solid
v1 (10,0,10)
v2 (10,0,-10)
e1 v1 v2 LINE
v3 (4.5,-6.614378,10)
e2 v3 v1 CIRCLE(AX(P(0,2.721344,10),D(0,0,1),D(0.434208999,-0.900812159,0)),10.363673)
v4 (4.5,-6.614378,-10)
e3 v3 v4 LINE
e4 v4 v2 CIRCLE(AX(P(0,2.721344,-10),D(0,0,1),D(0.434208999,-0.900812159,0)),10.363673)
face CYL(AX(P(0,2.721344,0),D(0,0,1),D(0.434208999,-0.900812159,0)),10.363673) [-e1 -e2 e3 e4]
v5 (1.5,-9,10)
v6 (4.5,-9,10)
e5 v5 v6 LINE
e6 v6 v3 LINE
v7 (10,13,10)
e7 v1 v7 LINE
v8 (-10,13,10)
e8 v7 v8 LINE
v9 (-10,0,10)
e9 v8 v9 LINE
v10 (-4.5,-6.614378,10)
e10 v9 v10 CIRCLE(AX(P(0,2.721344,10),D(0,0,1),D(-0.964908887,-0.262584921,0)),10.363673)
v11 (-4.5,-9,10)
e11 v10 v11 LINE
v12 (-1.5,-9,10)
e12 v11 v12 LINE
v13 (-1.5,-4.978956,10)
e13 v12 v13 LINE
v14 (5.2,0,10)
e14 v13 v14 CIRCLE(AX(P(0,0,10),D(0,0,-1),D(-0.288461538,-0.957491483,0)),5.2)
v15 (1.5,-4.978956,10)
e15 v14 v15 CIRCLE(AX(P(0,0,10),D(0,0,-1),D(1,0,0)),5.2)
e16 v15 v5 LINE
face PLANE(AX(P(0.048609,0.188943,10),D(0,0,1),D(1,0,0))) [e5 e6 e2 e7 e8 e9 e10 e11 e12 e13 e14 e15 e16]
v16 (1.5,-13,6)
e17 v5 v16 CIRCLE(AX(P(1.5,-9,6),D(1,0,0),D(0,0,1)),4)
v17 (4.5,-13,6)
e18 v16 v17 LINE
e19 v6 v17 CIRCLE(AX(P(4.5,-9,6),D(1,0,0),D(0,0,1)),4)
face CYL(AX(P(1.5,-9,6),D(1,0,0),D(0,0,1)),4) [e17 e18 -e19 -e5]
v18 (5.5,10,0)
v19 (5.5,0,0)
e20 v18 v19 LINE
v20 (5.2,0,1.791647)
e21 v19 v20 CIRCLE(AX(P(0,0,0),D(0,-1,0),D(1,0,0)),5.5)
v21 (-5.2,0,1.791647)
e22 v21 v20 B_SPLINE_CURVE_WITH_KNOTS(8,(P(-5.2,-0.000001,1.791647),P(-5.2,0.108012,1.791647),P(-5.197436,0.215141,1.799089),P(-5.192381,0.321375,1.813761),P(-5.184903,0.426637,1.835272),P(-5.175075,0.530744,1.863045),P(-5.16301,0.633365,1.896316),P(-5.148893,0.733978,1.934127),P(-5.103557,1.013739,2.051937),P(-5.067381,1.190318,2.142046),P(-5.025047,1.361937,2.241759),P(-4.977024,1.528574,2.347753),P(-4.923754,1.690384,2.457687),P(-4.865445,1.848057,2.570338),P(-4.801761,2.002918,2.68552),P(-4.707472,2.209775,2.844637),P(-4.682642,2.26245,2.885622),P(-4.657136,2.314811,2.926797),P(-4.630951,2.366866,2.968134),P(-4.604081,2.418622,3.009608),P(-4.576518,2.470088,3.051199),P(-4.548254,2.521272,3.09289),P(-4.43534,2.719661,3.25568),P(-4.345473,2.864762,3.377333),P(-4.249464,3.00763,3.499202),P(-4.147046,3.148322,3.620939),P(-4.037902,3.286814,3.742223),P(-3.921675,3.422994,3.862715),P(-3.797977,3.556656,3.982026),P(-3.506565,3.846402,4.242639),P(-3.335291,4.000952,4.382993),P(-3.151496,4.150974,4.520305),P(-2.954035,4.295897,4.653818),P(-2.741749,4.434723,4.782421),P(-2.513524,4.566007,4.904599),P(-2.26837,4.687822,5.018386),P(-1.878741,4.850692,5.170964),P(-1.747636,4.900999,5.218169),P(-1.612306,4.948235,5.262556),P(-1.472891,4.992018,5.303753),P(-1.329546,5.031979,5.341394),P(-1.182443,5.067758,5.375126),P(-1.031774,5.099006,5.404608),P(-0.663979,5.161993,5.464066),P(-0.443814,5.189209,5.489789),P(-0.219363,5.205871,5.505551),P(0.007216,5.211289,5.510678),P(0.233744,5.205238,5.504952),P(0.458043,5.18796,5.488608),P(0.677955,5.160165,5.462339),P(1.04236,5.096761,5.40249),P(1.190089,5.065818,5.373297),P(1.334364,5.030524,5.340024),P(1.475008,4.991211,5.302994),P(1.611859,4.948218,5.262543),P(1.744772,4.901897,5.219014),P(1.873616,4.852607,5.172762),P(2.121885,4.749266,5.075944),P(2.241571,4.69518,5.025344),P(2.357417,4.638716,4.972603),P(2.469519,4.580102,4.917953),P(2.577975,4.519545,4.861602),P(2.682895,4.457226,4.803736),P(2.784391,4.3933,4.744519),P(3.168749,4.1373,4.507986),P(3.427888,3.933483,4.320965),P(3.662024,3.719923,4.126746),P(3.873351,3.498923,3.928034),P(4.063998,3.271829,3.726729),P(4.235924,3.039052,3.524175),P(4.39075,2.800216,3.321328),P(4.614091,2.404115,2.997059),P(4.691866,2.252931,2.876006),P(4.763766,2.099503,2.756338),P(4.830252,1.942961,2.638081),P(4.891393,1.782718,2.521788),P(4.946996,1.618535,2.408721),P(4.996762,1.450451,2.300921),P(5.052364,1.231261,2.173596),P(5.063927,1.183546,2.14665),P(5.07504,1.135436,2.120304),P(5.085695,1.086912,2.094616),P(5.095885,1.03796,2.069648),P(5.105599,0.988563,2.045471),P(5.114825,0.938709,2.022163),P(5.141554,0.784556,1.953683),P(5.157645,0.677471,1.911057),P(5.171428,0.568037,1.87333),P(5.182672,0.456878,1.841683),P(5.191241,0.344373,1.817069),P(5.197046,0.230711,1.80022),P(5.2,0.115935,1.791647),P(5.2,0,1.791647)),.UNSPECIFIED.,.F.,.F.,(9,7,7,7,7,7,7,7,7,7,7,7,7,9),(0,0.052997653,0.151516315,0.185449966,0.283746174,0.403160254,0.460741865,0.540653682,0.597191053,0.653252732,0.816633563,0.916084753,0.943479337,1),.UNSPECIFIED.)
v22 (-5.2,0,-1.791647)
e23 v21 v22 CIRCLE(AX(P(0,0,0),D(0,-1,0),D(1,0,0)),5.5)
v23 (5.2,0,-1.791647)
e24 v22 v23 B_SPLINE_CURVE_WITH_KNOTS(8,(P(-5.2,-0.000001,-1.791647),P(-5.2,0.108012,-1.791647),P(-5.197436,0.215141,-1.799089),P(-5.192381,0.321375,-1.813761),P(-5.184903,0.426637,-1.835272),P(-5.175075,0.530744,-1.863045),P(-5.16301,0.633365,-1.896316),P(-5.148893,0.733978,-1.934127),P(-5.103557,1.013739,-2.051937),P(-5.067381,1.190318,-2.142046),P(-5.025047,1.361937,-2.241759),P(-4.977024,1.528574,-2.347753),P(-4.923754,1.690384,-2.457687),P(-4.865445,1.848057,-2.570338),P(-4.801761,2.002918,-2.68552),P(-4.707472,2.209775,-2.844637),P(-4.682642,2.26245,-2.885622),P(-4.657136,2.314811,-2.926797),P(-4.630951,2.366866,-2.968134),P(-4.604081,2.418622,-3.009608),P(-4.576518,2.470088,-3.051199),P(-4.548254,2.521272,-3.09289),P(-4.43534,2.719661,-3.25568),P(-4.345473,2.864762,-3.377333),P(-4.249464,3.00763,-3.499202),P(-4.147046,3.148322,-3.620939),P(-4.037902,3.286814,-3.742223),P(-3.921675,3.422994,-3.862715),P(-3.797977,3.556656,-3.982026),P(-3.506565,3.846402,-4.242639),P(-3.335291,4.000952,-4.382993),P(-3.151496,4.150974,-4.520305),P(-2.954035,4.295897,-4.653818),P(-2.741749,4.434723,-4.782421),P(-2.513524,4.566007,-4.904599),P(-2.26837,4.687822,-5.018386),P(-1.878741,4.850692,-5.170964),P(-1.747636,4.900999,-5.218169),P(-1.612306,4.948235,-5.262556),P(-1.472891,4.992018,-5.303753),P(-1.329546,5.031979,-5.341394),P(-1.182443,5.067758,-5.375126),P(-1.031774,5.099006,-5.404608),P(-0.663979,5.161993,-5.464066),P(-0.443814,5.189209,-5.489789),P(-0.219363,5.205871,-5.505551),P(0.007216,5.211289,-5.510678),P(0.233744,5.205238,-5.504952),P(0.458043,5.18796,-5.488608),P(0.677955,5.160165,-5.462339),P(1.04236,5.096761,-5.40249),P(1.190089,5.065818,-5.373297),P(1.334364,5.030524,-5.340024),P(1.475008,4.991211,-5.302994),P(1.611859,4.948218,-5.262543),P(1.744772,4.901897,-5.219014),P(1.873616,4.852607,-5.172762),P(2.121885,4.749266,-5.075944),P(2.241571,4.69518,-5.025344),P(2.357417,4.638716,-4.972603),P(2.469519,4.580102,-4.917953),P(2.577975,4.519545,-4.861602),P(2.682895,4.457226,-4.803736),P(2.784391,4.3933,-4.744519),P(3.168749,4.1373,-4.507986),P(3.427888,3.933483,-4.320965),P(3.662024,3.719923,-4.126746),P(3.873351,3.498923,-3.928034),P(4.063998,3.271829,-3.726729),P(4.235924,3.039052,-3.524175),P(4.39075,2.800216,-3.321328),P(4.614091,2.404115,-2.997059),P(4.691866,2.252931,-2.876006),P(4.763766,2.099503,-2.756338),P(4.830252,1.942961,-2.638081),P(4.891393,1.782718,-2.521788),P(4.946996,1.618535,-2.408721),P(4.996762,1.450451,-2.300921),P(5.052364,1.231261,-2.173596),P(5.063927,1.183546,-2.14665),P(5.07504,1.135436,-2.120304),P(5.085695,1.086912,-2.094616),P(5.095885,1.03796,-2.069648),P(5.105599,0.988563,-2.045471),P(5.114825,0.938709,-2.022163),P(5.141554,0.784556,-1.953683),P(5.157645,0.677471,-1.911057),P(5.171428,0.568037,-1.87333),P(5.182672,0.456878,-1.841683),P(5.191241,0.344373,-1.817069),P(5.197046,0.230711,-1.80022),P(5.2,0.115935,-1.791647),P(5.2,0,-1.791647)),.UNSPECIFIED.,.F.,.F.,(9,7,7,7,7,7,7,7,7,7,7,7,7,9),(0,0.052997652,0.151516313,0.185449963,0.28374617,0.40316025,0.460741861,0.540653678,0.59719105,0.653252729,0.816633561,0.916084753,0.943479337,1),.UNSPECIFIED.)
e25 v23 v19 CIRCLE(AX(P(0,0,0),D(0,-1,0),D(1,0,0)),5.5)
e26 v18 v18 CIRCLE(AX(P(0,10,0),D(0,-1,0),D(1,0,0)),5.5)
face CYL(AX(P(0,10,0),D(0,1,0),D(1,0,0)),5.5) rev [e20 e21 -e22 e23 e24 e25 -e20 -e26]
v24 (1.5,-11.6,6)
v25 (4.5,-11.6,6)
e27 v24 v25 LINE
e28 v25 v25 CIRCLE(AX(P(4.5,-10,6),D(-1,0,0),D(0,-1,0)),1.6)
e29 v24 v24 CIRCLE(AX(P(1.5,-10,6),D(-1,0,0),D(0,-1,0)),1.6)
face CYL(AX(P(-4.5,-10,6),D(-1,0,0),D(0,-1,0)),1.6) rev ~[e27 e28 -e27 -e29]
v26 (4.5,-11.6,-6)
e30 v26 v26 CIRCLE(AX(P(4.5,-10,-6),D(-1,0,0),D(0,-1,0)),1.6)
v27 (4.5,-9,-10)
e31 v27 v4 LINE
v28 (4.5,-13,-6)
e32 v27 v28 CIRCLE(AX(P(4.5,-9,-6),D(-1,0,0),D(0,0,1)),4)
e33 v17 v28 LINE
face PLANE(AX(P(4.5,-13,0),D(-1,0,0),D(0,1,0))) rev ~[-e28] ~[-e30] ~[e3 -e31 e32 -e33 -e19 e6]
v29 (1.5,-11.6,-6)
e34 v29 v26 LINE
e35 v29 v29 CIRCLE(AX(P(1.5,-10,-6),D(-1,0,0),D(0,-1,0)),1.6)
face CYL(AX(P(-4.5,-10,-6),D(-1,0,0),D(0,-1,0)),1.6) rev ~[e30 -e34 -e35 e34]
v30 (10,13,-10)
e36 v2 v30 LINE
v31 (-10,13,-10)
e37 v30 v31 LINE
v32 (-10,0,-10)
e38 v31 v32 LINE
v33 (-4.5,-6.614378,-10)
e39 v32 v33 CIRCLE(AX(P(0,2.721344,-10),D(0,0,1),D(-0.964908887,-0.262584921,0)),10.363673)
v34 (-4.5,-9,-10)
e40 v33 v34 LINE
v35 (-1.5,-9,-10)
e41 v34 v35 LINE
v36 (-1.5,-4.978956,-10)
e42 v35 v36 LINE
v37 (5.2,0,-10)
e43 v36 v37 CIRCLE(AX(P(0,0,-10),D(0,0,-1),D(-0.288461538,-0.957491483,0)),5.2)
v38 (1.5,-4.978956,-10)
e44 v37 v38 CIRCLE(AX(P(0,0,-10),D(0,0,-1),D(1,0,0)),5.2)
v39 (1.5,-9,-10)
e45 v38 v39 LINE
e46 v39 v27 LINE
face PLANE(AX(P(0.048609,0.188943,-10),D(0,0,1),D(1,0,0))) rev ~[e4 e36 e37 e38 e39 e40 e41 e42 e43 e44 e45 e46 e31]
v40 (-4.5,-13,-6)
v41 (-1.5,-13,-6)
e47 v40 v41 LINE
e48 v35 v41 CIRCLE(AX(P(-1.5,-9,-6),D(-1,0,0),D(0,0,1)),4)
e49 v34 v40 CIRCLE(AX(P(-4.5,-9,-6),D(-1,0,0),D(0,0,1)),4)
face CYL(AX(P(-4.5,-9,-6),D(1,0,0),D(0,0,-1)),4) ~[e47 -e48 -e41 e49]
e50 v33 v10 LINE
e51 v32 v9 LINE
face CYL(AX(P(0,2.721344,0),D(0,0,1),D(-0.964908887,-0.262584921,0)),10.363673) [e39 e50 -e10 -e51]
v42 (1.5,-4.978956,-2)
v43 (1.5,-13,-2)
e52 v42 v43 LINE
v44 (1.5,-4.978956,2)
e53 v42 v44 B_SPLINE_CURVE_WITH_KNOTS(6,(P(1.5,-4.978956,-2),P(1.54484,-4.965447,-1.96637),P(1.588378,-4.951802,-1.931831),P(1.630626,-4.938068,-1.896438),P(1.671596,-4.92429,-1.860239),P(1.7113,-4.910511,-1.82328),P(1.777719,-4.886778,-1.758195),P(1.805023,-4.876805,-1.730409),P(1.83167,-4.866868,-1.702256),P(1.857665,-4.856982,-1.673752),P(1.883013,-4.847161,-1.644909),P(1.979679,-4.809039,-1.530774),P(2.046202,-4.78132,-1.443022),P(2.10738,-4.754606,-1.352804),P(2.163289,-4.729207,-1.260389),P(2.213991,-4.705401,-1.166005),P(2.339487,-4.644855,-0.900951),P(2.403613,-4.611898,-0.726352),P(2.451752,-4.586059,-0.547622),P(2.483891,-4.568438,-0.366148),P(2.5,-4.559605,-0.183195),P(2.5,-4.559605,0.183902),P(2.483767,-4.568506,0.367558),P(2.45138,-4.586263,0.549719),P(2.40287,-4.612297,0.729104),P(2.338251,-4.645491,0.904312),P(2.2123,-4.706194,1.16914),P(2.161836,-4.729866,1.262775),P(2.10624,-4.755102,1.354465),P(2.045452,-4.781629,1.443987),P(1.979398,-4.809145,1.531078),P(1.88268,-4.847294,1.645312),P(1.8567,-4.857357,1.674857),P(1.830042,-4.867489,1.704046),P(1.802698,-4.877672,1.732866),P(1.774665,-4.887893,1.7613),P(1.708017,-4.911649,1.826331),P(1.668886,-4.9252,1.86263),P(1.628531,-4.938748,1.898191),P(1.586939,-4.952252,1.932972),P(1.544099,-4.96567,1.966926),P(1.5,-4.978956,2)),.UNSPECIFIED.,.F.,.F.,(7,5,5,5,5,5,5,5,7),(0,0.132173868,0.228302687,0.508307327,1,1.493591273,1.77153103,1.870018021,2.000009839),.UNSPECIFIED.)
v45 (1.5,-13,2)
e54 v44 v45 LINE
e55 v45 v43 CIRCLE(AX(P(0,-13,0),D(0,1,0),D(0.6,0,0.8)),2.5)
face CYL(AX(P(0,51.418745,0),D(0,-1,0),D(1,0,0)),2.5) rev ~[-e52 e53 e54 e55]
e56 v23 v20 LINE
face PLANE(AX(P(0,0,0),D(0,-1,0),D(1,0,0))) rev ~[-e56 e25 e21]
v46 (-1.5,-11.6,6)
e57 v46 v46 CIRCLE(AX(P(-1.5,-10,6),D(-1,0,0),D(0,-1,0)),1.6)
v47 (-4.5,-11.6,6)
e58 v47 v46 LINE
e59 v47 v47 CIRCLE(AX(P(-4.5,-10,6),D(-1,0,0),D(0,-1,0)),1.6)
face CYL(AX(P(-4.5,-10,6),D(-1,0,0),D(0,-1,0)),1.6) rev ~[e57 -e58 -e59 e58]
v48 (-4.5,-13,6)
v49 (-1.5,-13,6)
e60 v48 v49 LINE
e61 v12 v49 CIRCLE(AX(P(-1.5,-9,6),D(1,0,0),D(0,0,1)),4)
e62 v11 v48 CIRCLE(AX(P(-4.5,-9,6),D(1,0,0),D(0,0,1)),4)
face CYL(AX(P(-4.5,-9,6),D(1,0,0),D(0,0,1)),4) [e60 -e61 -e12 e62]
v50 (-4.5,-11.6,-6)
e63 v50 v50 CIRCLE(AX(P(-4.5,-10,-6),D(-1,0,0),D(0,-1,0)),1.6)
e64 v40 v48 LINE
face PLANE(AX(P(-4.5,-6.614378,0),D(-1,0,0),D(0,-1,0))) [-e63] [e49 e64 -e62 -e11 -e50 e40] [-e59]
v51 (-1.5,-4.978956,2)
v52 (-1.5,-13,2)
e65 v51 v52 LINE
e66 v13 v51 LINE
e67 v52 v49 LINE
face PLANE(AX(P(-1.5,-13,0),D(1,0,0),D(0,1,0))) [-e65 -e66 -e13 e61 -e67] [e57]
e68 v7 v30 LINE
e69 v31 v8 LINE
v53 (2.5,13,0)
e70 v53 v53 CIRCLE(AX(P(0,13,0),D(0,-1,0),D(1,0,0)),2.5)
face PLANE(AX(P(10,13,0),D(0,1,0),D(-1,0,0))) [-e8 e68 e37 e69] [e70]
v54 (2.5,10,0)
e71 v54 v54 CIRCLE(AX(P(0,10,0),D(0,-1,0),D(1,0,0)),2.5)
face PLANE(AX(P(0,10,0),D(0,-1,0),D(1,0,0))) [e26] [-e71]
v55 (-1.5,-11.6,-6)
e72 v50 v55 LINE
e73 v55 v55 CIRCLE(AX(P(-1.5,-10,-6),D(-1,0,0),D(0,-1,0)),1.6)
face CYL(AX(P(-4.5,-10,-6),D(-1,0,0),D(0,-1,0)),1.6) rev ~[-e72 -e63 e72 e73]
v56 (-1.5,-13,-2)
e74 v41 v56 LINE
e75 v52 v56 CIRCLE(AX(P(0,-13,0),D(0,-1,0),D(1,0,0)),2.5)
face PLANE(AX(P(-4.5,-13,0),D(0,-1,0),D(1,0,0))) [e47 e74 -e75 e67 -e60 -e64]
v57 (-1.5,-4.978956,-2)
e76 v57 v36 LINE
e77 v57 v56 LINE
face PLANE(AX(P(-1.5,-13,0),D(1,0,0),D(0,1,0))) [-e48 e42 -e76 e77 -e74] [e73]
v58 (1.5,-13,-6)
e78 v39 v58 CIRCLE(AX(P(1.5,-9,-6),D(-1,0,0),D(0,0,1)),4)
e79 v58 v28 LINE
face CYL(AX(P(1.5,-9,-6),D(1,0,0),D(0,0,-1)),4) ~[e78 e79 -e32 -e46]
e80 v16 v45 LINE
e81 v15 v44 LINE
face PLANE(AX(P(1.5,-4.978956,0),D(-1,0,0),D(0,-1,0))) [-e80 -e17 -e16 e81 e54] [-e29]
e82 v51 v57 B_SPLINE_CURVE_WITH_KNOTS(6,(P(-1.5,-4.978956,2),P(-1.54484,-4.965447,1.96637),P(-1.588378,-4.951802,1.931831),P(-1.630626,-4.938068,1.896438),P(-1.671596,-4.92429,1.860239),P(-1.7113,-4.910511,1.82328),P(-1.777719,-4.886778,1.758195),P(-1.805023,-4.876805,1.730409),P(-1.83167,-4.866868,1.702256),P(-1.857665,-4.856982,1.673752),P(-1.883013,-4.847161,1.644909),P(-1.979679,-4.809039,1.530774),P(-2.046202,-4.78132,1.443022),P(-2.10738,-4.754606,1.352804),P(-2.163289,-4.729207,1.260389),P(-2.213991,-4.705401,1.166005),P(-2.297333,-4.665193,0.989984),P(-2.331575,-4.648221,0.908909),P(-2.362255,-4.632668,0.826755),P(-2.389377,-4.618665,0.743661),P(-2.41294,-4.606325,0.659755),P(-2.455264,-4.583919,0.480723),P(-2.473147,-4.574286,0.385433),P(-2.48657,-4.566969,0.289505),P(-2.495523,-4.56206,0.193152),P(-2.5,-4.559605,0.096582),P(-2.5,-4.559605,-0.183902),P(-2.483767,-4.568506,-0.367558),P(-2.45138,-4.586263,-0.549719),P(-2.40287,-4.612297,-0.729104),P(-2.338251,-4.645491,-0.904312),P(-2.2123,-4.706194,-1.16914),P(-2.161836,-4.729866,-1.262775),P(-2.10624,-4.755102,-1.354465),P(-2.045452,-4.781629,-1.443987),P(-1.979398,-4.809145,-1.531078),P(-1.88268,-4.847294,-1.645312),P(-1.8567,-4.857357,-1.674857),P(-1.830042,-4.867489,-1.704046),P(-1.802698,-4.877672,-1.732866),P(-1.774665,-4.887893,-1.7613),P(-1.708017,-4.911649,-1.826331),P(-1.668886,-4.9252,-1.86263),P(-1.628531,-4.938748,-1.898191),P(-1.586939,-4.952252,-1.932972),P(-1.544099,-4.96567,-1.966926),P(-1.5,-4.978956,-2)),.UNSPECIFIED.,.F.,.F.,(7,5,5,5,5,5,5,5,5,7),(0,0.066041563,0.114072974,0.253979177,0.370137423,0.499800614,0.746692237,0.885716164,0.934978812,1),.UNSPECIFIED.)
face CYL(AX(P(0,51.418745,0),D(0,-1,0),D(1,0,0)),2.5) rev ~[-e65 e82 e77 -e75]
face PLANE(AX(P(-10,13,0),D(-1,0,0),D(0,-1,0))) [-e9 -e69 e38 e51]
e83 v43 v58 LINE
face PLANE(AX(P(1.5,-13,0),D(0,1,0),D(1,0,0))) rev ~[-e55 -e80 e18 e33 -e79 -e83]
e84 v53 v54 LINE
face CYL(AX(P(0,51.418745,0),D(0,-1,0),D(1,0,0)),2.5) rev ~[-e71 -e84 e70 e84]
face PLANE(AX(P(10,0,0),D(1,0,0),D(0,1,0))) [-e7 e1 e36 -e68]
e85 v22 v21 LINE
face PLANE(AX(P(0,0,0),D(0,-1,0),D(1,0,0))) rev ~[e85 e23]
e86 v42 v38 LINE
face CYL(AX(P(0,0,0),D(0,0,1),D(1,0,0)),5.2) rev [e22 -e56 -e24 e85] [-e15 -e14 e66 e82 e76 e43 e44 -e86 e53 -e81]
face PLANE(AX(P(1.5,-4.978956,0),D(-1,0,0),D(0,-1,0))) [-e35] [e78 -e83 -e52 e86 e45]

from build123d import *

# Parameters (mm, degrees)
F1_DEPTH = 10
F3_D     = 5
F4_R     = 1.6
F5_DEPTH = 14.501
F7_R     = 5.5
F8_DEPTH = 10
F9_R     = 4


# Not quite as in the source:
# - an extrude ends at something that could not be found from the text; its depth is read off the source's solid


with BuildPart() as f1:
    # F0 (on Top) → F1 (new body, symmetric)
    with BuildSketch(Plane.XY):
        with BuildLine():
            Line((10, 13), (-10, 13))
            Line((-10, 13), (-10, 0))
            ThreePointArc((-10, 0), (-7.9686887253, -3.9047945105), (-4.5, -6.6143782777))
            Line((-4.5, -6.6143782777), (-4.5, -13))
            Line((-4.5, -13), (-1.5, -13))
            Line((-1.5, -13), (-1.5, -4.9789557138))
            ThreePointArc((-1.5, -4.9789557138), (-3.1016124839, 4.1737273509), (5.2, 0))
            ThreePointArc((5.2, 0), (4.1737273509, -3.1016124839), (1.5, -4.9789557138))
            Line((1.5, -4.9789557138), (1.5, -13))
            Line((1.5, -13), (4.5, -13))
            Line((4.5, -13), (4.5, -6.6143782777))
            ThreePointArc((4.5, -6.6143782777), (7.9686887253, -3.9047945105), (10, 0))
            Line((10, 0), (10, 13))
        make_face()
    extrude(amount=F1_DEPTH, both=True)

    # F3 (through all)
    with Locations(Plane(origin=(0, 13, 0), x_dir=(-1, 0, 0), z_dir=(0, 1, 0))):
        with Locations((0, 0)):
            Hole(F3_D / 2)

    # F4 (on face) → F5 (cut, through all)
    with BuildSketch(Plane(origin=(-4.5, 0, 0), x_dir=(0, -1, 0), z_dir=(-1, 0, 0))):
        with Locations((10, 6)):
            Circle(F4_R)
        with Locations((10, -6)):
            Circle(F4_R)
    extrude(amount=-F5_DEPTH, mode=Mode.SUBTRACT)

    # F7 (on offset) → F8 (cut, through all)
    with BuildSketch(Plane.XZ.offset(-10)):
        Circle(F7_R)
    extrude(amount=F8_DEPTH, mode=Mode.SUBTRACT)

    # F9
    f9_edges = [f1.edges().sort_by_distance(p)[0] for p in [
        (3, -13, 10),
        (-3, -13, 10),
        (-3, -13, -10),
        (3, -13, -10),
    ]]
    fillet(f9_edges, radius=F9_R)


solid = f1.part
